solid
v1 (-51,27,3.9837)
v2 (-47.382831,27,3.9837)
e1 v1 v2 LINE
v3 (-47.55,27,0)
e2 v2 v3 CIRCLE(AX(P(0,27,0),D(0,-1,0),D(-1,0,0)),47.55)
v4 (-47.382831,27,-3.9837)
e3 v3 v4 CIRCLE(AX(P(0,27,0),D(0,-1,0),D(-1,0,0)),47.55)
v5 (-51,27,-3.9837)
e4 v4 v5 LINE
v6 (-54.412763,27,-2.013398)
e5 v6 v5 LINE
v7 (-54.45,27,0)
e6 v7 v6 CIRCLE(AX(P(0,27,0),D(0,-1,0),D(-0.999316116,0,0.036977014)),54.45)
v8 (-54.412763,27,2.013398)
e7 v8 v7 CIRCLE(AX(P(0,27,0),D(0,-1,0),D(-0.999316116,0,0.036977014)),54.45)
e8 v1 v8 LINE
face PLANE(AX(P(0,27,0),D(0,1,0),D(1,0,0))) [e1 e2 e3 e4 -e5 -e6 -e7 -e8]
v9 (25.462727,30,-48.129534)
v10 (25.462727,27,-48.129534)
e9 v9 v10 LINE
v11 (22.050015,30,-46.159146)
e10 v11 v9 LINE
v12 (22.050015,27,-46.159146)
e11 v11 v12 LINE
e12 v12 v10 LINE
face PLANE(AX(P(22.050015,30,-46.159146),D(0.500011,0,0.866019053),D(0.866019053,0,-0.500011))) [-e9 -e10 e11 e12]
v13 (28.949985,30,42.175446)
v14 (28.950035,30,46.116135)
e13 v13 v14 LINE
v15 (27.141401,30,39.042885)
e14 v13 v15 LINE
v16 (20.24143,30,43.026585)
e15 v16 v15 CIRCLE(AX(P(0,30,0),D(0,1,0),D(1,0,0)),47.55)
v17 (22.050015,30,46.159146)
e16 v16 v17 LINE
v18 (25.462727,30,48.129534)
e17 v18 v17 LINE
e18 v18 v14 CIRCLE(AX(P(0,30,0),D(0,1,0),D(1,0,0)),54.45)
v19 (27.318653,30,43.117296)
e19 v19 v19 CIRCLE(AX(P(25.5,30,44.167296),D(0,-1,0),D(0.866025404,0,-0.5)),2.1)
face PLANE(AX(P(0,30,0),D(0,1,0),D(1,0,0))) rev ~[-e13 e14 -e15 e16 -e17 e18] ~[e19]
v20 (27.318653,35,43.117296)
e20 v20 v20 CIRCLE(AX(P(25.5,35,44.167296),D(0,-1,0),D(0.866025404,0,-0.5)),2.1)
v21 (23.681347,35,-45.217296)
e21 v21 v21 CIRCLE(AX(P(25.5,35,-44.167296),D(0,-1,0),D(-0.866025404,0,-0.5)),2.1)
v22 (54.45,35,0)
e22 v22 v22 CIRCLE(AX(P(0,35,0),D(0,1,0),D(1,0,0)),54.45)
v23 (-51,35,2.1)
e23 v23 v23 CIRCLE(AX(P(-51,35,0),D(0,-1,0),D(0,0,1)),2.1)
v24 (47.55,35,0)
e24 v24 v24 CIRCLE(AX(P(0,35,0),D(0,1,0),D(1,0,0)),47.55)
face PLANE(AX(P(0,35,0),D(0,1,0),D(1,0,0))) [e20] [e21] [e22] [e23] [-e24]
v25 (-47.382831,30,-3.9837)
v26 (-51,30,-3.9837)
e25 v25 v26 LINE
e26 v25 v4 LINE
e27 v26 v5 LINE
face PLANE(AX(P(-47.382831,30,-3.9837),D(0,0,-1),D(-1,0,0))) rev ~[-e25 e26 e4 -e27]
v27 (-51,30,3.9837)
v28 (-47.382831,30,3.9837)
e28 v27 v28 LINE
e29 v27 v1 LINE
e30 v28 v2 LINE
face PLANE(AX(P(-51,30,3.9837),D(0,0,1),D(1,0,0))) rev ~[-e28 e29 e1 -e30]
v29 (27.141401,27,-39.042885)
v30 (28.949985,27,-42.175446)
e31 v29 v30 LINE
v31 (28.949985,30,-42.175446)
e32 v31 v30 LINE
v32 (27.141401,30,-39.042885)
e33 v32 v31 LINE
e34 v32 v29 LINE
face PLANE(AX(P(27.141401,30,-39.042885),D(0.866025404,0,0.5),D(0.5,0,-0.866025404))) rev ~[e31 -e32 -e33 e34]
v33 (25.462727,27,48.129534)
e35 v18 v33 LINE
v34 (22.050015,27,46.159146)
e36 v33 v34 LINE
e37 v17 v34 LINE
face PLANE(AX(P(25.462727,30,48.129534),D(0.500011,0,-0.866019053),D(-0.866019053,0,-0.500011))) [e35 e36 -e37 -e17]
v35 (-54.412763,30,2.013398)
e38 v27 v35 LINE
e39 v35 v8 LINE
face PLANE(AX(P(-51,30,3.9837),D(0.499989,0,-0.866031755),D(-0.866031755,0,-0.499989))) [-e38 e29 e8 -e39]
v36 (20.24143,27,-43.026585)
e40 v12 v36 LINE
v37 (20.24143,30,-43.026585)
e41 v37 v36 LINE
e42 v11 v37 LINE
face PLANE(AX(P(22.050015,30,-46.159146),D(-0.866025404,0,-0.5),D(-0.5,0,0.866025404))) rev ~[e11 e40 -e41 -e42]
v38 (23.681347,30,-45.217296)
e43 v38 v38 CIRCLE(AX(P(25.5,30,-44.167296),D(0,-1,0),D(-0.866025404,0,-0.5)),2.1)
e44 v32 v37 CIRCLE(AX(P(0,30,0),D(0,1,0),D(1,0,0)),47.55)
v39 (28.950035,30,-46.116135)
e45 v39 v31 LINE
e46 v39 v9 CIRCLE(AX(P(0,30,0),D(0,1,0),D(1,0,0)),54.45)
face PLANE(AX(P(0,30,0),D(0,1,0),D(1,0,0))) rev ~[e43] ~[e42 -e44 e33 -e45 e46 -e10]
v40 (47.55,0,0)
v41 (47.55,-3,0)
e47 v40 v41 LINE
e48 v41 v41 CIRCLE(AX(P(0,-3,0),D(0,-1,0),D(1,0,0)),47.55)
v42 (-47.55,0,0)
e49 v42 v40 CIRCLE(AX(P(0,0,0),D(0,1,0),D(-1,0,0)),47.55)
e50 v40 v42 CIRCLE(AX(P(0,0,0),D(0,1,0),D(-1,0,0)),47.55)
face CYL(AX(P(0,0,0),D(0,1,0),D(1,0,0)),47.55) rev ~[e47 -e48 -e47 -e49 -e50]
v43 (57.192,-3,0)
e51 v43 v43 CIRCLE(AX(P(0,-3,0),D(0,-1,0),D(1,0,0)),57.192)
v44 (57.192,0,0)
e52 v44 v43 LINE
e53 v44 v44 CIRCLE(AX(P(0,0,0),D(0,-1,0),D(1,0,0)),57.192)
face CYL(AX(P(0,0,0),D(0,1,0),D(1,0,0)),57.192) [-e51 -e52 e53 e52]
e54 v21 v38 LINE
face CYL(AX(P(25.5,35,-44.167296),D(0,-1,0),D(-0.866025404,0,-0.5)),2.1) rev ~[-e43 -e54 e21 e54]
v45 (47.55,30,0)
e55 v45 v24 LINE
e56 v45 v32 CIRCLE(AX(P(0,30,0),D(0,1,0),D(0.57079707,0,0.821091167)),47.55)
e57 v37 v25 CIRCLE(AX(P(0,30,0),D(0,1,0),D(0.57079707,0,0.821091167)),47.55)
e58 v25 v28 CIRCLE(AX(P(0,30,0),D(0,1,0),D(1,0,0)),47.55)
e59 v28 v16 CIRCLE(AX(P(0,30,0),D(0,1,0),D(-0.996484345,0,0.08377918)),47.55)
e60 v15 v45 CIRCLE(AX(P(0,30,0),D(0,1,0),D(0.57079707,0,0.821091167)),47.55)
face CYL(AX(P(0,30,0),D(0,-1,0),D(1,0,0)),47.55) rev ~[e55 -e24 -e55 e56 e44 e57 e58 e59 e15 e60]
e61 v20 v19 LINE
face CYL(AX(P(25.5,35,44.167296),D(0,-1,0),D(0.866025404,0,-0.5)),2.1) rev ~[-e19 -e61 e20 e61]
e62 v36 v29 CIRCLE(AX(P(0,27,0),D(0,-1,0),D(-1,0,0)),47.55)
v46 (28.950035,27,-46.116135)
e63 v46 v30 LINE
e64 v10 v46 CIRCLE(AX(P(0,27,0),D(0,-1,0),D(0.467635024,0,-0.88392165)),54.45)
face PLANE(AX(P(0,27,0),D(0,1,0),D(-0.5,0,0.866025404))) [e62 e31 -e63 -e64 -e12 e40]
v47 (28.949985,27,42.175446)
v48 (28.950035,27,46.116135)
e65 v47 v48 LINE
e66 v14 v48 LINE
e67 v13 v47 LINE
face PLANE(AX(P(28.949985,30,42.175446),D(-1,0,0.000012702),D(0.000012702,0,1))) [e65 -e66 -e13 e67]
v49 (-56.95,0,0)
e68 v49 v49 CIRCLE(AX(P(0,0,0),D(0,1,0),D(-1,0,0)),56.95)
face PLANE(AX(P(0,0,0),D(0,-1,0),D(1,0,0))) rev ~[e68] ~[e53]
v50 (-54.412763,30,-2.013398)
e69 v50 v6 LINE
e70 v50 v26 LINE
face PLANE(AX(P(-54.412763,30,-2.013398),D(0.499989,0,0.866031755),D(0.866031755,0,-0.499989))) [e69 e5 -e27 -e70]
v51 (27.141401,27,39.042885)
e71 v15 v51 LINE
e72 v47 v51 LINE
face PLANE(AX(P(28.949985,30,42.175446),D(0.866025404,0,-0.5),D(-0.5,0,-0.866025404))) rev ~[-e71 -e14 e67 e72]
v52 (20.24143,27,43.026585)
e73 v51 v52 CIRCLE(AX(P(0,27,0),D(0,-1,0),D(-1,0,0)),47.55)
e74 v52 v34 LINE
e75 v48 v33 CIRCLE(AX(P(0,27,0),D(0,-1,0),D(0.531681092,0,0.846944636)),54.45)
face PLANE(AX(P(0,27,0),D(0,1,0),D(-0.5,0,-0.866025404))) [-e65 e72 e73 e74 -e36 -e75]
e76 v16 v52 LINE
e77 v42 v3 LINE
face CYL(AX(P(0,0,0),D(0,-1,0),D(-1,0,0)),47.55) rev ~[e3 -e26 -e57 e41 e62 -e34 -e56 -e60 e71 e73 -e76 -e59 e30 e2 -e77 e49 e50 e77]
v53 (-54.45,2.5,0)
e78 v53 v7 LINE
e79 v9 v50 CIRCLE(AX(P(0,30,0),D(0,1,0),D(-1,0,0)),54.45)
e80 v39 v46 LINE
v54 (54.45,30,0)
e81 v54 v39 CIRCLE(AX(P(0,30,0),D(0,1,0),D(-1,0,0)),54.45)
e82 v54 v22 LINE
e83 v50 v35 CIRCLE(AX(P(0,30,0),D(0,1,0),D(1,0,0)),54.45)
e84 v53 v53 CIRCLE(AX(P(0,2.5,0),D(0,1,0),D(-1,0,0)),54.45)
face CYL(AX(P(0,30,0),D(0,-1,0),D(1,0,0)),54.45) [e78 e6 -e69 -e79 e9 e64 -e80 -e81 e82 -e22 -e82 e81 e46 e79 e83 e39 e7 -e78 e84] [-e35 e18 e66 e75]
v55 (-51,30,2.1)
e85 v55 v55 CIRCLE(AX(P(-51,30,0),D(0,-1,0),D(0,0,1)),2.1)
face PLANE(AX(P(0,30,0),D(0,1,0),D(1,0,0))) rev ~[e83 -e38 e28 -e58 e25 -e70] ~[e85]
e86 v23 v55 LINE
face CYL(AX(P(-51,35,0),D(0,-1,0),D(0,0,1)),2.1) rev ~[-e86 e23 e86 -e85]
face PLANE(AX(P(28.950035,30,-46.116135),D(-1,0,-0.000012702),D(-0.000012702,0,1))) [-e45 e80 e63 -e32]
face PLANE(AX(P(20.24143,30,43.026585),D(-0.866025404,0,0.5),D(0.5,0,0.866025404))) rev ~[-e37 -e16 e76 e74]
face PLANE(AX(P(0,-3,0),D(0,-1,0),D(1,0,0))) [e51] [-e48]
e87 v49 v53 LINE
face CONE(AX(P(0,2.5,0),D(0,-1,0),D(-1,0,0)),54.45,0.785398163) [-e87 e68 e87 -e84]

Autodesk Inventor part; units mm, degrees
ref_plane "YZ Plane" through (0, 0, 0) normal (1, 0, 0) x (0, 1, 0)
ref_plane "XZ Plane" through (0, 0, 0) normal (0, 1, 0) x (-1, 0, 0)
ref_plane "XY Plane" through (0, 0, 0) normal (0, 0, 1) x (1, 0, 0)
sketch "Sketch1" plane through (0, 0, 0) normal (0, 1, 0) x (-1, 0, 0)
  circle A0 centre (0, 0) radius 51
  circle A1 centre (0, 0) radius 47.55
  circle A2 centre (0, 0) radius 54.45
  dimension "d0" = 102
  dimension "d6" = 95.1
  dimension "d7" = 108.9
extrude "Extrusion1" add sketch "Sketch1" along normal blind 30 contours A0 | A2
sketch "Sketch2" plane through (0, 30, 0) normal (0, 1, 0) x (1, 0, 0)
  line L0 (-51, 3.9837) -> (-47.55, 1.9919)
  line L1 (-47.55, 1.9919) -> (-47.55, -1.9919)
  line L2 (-47.55, -1.9919) -> (-51, -3.9837)
  line L3 (-51, -3.9837) -> (-54.45, -1.9919)
  line L4 (-54.45, -1.9919) -> (-54.45, 1.9919)
  line L5 (-54.45, 1.9919) -> (-51, 3.9837)
  circle A0 centre (0, 0) radius 54.45 projected
  circle A1 centre (0, 0) radius 47.55 projected
  line L6 (-51, -3.9837) -> (-47.2749, -3.9837)
  line L7 (-47.2749, -3.9837) -> (-47.2749, 3.9837)
  line L8 (-47.2749, 3.9837) -> (-51, 3.9837)
  line L9 (-51, 3.9837) -> (-51, -3.9837)
  point P0 (-51, 0)
  point P1 (-54.4128, 2.0134)
  point P2 (-54.4128, -2.0134)
  point P3 (-47.3828, -3.9837)
  point P4 (-47.55, 0)
  point P5 (-47.3828, 3.9837)
extrude "Extrusion2" cut sketch "Sketch2" against normal blind 3 contours L8 A1 L1 L0 | L9 L3 A0 L5 | L0 L1 L2 L9 | L8 L7 L6 A1 | A1 L6 L7 L8 | L2 L1 A1 L6
pattern_circular "Circular Pattern1" count 3 over 360 about axis through (0, 0, 0) along (0, 1, 0) of "Extrusion2"
sketch "Sketch3" plane through (0, 30, 0) normal (0, 1, 0) x (1, 0, 0)
  circle A0 centre (0, 0) radius 47.55
  circle A1 centre (0, 0) radius 54.45
extrude "Extrusion3" add sketch "Sketch3" along normal blind 5
sketch "Sketch4" plane through (0, 35, 0) normal (0, 1, 0) x (1, 0, 0)
  line L0 (-76.23, 0) -> (76.23, 0) projected
  point P0 (0, 0)
  point P1 (-51, 0)
  dimension "d22" = 51
hole "Hole1" at (-51, 35, 0) direction (0, -1, 0) diameter 4.2 depth 5
pattern_circular "Circular Pattern2" count 3 over 360 about axis through (0, 0, 0) along (0, 1, 0) of "Hole1"
sketch "Sketch5" plane through (0, 0, 0) normal (0, -1, 0) x (1, 0, 0)
  circle A0 centre (0, 0) radius 47.55
  circle A1 centre (0, 0) radius 57.192
extrude "Extrusion4" add sketch "Sketch5" along normal blind 3
chamfer "Chamfer2" distance 2.5 angle 45 1 edges at (54.45, 0, 0)
properties part number "CenterCylinder_2"
